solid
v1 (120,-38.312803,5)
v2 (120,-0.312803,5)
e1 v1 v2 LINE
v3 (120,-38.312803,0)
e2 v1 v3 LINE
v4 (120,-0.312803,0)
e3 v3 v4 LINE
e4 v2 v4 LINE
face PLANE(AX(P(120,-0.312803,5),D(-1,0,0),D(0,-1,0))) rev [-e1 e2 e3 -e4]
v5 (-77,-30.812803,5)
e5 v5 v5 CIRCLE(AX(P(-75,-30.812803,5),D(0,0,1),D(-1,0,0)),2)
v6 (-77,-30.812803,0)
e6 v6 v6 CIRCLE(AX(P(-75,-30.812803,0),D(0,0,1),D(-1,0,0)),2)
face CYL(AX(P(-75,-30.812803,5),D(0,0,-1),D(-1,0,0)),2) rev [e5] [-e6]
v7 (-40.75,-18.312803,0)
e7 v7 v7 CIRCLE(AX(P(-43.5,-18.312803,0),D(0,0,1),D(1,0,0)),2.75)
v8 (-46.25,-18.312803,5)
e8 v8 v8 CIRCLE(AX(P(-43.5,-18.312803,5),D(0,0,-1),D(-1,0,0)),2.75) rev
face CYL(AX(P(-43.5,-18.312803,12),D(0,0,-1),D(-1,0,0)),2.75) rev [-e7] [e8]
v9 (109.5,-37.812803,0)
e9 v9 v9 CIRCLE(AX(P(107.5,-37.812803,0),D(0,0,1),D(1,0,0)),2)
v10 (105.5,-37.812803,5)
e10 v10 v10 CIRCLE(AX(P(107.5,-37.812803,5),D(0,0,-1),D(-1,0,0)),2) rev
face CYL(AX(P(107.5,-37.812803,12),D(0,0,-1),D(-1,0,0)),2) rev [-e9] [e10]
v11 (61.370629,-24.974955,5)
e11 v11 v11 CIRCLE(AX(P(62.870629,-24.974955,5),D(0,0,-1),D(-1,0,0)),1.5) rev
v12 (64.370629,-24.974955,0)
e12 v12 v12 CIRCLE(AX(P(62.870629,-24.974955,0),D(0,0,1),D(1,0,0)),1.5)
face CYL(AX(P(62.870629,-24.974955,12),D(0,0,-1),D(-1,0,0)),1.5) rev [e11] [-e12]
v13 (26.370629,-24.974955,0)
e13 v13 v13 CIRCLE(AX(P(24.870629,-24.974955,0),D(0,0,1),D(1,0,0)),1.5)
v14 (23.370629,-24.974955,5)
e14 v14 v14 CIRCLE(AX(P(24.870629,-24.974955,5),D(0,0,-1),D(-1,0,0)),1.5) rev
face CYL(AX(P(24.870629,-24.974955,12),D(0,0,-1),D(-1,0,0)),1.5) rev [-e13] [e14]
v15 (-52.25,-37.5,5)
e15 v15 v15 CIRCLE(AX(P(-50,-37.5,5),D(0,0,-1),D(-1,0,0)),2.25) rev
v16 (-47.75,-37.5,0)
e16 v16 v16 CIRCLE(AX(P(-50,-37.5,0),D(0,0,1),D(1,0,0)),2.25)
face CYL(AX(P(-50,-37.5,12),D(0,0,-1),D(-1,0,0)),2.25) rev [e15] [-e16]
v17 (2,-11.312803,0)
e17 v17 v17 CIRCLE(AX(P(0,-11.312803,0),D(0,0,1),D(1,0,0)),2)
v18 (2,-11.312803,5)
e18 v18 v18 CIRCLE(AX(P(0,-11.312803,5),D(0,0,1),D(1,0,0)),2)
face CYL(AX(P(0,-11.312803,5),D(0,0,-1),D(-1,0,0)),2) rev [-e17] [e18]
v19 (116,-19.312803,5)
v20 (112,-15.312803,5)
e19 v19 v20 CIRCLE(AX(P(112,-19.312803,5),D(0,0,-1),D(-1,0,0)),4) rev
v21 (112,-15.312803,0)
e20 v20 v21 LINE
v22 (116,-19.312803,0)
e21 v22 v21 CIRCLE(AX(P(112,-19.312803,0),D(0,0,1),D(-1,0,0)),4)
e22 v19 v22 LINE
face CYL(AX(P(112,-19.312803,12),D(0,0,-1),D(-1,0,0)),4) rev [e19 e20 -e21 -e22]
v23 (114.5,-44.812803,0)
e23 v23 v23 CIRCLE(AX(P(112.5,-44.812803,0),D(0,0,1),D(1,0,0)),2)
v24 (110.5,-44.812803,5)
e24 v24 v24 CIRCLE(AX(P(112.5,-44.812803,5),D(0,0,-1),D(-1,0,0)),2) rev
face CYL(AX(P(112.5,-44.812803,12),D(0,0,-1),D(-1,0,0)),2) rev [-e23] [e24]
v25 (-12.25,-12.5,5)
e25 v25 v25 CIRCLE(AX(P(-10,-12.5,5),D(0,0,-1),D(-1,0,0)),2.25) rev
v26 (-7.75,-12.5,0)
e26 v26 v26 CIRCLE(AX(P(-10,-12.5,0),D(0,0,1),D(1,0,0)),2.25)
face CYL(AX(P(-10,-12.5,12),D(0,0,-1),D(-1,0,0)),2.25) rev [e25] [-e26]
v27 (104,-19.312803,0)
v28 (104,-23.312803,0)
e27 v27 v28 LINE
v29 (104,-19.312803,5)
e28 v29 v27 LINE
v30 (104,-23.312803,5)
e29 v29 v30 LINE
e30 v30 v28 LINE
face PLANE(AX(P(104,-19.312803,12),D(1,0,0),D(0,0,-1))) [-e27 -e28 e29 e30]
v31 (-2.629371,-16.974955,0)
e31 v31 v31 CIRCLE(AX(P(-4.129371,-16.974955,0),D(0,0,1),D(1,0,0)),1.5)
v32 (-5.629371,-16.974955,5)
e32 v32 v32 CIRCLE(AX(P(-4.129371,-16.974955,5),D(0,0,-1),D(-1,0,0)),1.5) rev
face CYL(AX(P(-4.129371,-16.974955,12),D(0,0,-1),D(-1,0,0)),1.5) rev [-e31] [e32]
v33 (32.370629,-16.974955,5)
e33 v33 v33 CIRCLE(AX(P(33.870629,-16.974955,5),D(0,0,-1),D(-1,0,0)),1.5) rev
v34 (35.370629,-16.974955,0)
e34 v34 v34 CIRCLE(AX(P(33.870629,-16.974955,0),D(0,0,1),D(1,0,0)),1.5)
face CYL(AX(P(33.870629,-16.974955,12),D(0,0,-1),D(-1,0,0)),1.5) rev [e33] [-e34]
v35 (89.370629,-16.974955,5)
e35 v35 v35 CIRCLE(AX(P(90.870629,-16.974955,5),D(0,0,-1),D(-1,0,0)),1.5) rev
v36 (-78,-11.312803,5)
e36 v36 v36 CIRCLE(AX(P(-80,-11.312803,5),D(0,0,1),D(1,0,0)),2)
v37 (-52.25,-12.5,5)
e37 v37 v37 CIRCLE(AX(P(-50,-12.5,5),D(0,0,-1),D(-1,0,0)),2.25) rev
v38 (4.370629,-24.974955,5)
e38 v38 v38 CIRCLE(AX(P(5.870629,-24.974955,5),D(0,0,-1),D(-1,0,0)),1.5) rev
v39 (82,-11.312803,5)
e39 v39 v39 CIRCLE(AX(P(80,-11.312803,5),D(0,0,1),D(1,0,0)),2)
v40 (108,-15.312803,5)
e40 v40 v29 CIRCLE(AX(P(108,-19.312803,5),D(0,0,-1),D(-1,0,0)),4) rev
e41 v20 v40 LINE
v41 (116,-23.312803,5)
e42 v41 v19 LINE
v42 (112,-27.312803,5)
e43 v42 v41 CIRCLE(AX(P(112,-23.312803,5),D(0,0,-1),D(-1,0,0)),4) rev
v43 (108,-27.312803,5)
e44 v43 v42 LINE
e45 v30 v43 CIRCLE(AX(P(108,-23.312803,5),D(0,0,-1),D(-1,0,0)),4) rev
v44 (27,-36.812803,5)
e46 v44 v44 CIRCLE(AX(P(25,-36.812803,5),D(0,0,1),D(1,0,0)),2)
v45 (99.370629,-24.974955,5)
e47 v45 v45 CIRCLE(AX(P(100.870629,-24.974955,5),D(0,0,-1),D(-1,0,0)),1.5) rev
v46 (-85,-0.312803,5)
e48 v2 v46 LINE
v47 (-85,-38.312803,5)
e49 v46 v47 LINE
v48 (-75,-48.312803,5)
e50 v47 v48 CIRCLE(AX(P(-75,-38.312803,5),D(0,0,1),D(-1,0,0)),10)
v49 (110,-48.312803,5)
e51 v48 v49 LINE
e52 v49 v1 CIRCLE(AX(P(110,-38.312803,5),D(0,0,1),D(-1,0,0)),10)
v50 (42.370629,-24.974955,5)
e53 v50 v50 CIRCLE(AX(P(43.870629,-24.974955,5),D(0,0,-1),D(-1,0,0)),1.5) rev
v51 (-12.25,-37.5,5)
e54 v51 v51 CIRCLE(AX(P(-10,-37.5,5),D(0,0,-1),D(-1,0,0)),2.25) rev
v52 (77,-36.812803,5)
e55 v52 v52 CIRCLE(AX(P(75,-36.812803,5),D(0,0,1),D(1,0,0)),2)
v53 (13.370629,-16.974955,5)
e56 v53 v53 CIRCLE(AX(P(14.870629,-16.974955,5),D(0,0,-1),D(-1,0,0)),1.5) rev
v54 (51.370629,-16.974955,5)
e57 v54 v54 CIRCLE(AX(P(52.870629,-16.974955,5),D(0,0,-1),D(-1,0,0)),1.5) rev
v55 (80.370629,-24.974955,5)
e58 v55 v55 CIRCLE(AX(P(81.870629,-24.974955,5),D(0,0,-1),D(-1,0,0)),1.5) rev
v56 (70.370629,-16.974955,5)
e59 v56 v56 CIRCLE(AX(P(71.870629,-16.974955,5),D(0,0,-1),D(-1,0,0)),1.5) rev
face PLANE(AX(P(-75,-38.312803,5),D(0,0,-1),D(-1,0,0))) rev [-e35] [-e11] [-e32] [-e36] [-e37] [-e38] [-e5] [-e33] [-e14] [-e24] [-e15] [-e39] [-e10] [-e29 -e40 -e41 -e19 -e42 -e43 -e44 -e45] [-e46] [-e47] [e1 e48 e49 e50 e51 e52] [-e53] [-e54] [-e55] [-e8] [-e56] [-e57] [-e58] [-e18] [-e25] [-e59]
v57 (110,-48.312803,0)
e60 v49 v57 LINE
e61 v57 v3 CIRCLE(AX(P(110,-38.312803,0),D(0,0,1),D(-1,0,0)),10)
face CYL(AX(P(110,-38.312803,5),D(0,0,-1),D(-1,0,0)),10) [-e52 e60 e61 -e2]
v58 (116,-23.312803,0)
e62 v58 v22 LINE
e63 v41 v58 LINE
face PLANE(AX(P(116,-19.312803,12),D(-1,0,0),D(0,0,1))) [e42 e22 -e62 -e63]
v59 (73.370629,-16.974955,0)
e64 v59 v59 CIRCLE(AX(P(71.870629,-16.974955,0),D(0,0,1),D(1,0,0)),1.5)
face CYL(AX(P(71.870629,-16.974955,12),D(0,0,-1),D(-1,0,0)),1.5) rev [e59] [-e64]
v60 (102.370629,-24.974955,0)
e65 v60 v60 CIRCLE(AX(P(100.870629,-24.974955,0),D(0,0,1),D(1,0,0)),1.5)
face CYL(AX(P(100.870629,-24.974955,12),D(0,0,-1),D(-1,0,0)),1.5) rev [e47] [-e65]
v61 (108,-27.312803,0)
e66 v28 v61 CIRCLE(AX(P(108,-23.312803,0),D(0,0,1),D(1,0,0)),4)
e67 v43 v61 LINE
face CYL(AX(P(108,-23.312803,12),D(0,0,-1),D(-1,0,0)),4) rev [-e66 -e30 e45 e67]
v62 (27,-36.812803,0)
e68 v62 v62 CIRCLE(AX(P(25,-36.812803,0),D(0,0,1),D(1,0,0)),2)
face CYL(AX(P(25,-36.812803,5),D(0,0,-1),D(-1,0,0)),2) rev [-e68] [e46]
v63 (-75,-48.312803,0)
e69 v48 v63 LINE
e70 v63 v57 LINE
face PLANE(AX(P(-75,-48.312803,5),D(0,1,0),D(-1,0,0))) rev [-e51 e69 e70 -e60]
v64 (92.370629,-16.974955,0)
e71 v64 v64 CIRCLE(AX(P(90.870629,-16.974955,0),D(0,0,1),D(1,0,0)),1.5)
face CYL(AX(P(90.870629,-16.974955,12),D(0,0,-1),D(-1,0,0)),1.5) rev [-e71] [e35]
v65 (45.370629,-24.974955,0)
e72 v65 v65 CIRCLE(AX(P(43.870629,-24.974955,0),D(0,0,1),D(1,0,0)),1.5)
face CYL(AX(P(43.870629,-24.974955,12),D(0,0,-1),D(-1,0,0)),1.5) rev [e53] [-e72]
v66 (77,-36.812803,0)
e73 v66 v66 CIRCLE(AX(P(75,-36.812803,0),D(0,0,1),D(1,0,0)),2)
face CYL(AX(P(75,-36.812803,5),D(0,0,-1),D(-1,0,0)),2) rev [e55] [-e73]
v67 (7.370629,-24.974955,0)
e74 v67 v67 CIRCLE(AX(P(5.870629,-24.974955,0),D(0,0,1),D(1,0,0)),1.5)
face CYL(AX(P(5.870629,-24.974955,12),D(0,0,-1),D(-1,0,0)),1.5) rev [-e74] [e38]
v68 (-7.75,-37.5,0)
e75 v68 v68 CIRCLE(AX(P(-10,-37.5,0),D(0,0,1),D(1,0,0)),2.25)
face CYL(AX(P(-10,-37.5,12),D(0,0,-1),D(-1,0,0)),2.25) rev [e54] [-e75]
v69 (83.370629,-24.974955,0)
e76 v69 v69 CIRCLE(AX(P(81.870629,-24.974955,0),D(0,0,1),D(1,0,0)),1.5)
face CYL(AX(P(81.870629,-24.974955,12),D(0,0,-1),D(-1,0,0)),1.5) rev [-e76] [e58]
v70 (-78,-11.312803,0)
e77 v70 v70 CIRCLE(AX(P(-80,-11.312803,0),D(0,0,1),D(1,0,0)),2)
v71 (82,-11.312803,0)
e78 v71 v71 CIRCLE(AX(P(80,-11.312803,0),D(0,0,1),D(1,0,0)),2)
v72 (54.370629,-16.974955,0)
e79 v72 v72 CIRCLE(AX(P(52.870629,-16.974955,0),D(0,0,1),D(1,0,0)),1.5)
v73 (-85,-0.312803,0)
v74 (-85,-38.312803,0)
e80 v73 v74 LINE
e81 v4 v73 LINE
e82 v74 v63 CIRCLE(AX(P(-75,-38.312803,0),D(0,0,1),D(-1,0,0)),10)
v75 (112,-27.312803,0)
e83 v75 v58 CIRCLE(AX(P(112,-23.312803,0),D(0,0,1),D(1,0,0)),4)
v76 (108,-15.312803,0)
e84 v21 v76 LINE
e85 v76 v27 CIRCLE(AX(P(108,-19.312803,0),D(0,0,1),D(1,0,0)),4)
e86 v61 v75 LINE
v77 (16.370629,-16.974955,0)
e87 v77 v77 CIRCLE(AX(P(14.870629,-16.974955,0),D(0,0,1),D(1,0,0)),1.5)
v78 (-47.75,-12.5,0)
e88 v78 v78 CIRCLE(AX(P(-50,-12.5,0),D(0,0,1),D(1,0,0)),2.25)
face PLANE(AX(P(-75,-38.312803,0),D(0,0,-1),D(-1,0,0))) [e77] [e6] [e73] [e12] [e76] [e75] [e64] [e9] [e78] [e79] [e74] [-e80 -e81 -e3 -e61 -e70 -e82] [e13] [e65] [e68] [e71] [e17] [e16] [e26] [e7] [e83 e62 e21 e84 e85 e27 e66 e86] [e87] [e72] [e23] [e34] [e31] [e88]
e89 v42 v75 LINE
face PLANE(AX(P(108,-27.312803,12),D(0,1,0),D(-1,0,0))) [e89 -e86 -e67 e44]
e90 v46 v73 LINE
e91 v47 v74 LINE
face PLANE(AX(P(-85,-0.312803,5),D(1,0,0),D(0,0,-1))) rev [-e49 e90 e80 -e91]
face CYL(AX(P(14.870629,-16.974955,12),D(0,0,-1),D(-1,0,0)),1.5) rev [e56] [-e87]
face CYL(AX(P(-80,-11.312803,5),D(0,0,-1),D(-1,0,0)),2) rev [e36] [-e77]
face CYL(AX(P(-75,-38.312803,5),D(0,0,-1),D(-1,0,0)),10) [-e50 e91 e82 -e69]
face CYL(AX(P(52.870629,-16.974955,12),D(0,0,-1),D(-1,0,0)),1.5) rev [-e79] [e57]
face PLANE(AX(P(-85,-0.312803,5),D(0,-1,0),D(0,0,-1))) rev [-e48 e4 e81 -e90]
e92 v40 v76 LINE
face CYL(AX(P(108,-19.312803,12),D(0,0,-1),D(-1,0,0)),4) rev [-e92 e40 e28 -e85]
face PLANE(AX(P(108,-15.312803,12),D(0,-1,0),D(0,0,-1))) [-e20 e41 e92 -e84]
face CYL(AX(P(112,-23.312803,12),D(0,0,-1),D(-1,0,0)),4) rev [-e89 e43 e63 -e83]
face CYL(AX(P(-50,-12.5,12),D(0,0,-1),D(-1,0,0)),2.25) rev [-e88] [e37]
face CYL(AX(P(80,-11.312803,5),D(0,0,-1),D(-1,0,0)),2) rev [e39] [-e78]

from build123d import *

# Parameters (mm, degrees)
SKETCH_1_R              = 2
EXTRUDE_1_DEPTH         = 5
SKETCH_2_R              = 2.75
SKETCH_2_R_2            = 2
SKETCH_2_R_3            = 2.25
CUT_EXTRUDE_1_DEPTH     = 12
CUT_EXTRUDE_2_OUTLINE_R = 1.5
CUT_EXTRUDE_2_DEPTH     = 5


# Read off the part's stored shape, not the designer's step: 切除-拉伸2
with BuildPart() as part:
    # 草图1 → 凸台-拉伸1 (new body)
    with BuildSketch(Plane.XY):
        with BuildLine():
            Line((-85, -0.312803354), (120, -0.312803354))
            Line((120, -0.312803354), (120, -38.312803354))
            ThreePointArc((120, -38.312803354), (117.071067812, -45.383871166), (110, -48.312803354))
            Line((110, -48.312803354), (-75, -48.312803354))
            ThreePointArc((-75, -48.312803354), (-82.071067812, -45.383871166), (-85, -38.312803354))
            Line((-85, -38.312803354), (-85, -0.312803354))
        make_face()
        with Locations((-80, -11.312803354)):
            Circle(SKETCH_1_R, mode=Mode.SUBTRACT)
        with Locations((0, -11.312803354)):
            Circle(SKETCH_1_R, mode=Mode.SUBTRACT)
        with Locations((80, -11.312803354)):
            Circle(SKETCH_1_R, mode=Mode.SUBTRACT)
        with Locations((75, -36.812803354)):
            Circle(SKETCH_1_R, mode=Mode.SUBTRACT)
        with Locations(Location((-75, -30.812803354, 0), (0, 0, 180))):
            Circle(SKETCH_1_R, mode=Mode.SUBTRACT)
        with Locations((25, -36.812803354)):
            Circle(SKETCH_1_R, mode=Mode.SUBTRACT)
    extrude(amount=EXTRUDE_1_DEPTH)

    # 草图2 → 切除-拉伸1 (cut)
    with BuildSketch(Plane.XY):
        with Locations(Location((-43.5, -18.312803354, 0), (0, 0, 180))):
            Circle(SKETCH_2_R)
        with Locations(Location((107.5, -37.812803354, 0), (0, 0, 180))):
            Circle(SKETCH_2_R_2)
        with Locations(Location((112.5, -44.812803354, 0), (0, 0, 180))):
            Circle(SKETCH_2_R_2)
        with Locations(Location((-50, -12.5, 0), (0, 0, 180))):
            Circle(SKETCH_2_R_3)
        with Locations(Location((-10, -12.5, 0), (0, 0, 180))):
            Circle(SKETCH_2_R_3)
        with Locations(Location((-50, -37.5, 0), (0, 0, 180))):
            Circle(SKETCH_2_R_3)
        with Locations(Location((-10, -37.5, 0), (0, 0, 180))):
            Circle(SKETCH_2_R_3)
        with BuildLine():
            Line((108, -15.312803354), (112, -15.312803354))
            ThreePointArc((112, -15.312803354), (114.828427125, -16.48437623), (116, -19.312803354))
            Line((116, -19.312803354), (116, -23.312803354))
            ThreePointArc((116, -23.312803354), (114.828427125, -26.141230479), (112, -27.312803354))
            Line((112, -27.312803354), (108, -27.312803354))
            ThreePointArc((108, -27.312803354), (105.171572875, -26.141230479), (104, -23.312803354))
            Line((104, -23.312803354), (104, -19.312803354))
            ThreePointArc((104, -19.312803354), (105.171572875, -16.48437623), (108, -15.312803354))
        make_face()
    extrude(amount=CUT_EXTRUDE_1_DEPTH, mode=Mode.SUBTRACT)

    # 切除-拉伸2 outline → 切除-拉伸2 (cut)
    with BuildSketch(Plane.XY):
        with Locations((100.870628671, -24.974954548)):
            Circle(CUT_EXTRUDE_2_OUTLINE_R)
        with Locations((90.870628671, -16.974954548)):
            Circle(CUT_EXTRUDE_2_OUTLINE_R)
        with Locations((81.870628671, -24.974954548)):
            Circle(CUT_EXTRUDE_2_OUTLINE_R)
        with Locations((71.870628671, -16.974954548)):
            Circle(CUT_EXTRUDE_2_OUTLINE_R)
        with Locations((62.870628671, -24.974954548)):
            Circle(CUT_EXTRUDE_2_OUTLINE_R)
        with Locations((52.870628671, -16.974954548)):
            Circle(CUT_EXTRUDE_2_OUTLINE_R)
        with Locations((43.870628671, -24.974954548)):
            Circle(CUT_EXTRUDE_2_OUTLINE_R)
        with Locations((33.870628671, -16.974954548)):
            Circle(CUT_EXTRUDE_2_OUTLINE_R)
        with Locations((24.870628671, -24.974954548)):
            Circle(CUT_EXTRUDE_2_OUTLINE_R)
        with Locations((14.870628671, -16.974954548)):
            Circle(CUT_EXTRUDE_2_OUTLINE_R)
        with Locations((5.870628671, -24.974954548)):
            Circle(CUT_EXTRUDE_2_OUTLINE_R)
        with Locations((-4.129371329, -16.974954548)):
            Circle(CUT_EXTRUDE_2_OUTLINE_R)
    extrude(amount=CUT_EXTRUDE_2_DEPTH, mode=Mode.SUBTRACT)


solid = part.part
